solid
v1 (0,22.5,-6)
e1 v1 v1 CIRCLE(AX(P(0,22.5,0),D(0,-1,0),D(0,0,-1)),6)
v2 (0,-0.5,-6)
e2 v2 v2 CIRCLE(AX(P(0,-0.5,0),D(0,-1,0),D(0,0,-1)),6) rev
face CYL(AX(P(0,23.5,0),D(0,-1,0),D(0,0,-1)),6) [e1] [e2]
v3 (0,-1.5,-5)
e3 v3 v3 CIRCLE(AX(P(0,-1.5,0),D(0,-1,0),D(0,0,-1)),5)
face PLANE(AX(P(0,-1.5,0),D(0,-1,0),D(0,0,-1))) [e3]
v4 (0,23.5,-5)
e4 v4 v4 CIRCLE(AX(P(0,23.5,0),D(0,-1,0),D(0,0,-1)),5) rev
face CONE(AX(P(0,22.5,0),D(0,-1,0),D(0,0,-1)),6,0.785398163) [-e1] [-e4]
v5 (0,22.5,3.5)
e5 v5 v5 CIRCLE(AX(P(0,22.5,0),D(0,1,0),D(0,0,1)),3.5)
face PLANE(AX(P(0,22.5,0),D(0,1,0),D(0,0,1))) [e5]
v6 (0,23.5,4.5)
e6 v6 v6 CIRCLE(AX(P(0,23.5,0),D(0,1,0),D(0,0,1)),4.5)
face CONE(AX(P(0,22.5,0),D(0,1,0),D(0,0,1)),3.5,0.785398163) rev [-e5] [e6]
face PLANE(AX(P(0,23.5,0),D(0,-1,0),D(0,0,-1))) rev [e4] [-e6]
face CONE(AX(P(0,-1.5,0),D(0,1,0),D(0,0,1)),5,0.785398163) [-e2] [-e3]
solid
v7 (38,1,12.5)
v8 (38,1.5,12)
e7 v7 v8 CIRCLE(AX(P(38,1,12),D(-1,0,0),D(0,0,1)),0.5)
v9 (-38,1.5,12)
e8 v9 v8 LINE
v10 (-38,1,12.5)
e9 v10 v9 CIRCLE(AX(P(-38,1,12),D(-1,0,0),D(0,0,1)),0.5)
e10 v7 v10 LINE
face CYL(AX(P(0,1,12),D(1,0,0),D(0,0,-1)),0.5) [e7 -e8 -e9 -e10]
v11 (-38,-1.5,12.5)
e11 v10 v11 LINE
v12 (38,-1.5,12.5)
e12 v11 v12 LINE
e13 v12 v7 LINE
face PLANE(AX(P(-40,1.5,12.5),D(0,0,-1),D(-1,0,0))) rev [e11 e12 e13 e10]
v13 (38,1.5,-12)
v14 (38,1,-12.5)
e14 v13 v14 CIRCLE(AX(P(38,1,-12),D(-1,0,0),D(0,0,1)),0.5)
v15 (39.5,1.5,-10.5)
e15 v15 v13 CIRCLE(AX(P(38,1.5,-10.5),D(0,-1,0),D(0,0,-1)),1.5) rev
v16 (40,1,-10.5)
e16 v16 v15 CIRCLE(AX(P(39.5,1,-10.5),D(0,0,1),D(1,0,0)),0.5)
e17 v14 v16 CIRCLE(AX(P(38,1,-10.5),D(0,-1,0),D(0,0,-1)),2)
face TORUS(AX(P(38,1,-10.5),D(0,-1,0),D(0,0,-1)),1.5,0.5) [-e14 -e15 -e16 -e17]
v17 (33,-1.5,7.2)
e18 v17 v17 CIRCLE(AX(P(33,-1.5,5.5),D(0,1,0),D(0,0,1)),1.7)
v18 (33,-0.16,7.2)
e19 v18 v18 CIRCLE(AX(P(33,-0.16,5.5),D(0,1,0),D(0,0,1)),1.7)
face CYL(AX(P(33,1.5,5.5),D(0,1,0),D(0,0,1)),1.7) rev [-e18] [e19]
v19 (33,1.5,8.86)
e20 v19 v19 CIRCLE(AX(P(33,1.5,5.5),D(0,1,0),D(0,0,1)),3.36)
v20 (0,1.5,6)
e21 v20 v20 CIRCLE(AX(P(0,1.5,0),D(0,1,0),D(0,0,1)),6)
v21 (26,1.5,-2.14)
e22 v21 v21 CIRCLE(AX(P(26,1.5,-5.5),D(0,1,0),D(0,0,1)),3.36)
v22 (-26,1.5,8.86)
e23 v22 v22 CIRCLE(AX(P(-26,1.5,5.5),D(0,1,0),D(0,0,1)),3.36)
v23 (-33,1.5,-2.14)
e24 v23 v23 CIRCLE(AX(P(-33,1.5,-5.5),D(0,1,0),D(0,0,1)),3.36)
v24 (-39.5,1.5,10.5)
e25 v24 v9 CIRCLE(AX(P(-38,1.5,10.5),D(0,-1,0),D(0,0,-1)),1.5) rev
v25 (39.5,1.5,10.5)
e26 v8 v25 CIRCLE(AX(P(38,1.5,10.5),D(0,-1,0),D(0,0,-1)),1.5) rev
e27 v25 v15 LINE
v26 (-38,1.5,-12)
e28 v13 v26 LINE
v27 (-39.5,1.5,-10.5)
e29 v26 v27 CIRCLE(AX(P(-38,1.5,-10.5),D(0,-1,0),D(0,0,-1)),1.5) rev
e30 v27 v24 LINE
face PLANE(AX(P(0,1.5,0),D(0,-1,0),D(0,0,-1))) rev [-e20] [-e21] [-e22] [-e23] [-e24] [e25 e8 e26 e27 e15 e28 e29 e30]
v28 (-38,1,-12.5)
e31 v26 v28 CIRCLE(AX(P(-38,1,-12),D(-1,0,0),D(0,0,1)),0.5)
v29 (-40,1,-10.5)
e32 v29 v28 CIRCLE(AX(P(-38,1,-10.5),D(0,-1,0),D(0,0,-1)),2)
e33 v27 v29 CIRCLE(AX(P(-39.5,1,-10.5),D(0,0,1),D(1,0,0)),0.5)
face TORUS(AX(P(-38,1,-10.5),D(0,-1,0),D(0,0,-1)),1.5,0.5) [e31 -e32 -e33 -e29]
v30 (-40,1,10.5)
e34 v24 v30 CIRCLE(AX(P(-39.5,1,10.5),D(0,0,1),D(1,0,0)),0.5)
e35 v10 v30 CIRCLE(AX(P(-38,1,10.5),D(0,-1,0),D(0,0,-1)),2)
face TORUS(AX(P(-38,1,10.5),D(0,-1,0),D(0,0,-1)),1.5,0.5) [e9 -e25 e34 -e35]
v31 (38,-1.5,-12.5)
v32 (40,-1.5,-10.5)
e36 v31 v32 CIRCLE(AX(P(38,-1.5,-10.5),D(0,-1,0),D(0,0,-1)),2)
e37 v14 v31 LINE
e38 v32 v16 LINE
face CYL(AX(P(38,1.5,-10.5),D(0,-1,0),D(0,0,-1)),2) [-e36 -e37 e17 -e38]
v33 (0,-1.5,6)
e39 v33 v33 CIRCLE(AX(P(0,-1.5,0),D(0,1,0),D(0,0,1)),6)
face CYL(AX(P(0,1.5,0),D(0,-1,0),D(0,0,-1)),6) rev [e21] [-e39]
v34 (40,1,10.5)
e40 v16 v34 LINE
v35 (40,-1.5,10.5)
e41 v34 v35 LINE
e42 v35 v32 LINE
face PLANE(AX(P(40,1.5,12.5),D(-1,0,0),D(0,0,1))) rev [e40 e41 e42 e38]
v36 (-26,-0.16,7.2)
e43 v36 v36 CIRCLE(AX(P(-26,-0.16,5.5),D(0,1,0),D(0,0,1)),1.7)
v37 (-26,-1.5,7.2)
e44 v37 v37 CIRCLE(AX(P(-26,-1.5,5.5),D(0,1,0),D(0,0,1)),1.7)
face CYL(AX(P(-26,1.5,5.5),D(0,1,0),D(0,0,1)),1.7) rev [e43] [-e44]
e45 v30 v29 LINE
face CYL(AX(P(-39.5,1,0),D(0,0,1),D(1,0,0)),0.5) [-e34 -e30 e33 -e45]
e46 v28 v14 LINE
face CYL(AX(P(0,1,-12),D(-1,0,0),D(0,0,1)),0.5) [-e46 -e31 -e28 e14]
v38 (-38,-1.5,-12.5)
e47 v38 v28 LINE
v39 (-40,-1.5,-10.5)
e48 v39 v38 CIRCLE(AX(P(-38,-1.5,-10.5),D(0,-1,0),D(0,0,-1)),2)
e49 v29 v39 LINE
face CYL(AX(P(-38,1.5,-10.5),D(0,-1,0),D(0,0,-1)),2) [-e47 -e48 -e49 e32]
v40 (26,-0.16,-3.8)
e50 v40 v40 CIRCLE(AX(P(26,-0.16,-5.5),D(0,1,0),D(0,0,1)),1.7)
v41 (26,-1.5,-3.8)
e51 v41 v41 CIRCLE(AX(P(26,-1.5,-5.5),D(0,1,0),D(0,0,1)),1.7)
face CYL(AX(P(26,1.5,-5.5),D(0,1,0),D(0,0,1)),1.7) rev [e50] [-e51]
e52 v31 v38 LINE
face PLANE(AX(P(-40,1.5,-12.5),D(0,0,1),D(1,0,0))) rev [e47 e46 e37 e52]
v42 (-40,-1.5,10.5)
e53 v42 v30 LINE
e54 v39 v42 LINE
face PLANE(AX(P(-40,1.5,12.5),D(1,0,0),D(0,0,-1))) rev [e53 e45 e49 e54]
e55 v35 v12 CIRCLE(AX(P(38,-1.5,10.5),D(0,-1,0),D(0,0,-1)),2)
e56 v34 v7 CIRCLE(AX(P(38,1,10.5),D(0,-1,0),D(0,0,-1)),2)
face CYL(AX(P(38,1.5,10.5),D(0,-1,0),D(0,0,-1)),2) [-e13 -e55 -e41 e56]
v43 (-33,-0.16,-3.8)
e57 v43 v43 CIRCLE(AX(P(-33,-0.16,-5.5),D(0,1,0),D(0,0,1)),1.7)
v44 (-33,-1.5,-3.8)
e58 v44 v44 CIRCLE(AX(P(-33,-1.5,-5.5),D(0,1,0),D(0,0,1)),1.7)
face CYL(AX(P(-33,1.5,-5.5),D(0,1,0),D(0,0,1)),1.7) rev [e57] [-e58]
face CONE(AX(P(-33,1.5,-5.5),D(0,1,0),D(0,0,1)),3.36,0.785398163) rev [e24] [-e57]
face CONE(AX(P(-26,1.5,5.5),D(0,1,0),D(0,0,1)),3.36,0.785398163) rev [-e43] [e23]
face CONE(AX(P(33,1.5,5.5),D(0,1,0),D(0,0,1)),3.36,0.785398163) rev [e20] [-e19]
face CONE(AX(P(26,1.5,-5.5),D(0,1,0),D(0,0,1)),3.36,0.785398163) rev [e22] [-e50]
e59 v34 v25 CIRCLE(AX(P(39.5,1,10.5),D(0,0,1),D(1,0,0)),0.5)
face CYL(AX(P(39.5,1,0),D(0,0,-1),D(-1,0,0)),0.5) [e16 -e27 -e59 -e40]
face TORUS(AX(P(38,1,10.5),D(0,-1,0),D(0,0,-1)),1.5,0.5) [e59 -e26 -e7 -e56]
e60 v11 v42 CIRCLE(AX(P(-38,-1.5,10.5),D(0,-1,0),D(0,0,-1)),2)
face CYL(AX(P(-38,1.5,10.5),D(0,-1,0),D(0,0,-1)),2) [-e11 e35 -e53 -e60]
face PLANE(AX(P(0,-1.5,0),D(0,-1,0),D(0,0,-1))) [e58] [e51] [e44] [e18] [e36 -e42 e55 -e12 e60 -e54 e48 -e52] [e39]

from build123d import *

# Parameters (mm, degrees)
ESBO_O1_W                           = 80
ESBO_O1_H                           = 25
ESBO_O1_R                           = 6
RESSALTO_EXTRUS_O1_DEPTH            = 1.5
ESBO_O3_R                           = 6
RESSALTO_EXTRUS_O3_DEPTH            = 25
CHANFRO1_SIZE                       = 1
ESCAREADO_PARA_SFHCS_M31_AT_2_COUNT = 2
ESCAREADO_PARA_SFHCS_M31_AT_2_PITCH = 13.03840481
ESCAREADO_PARA_SFHCS_M31_AT_3_COUNT = 2
ESCAREADO_PARA_SFHCS_M31_AT_3_PITCH = 59
ESCAREADO_PARA_SFHCS_M31_AT_4_COUNT = 2
ESCAREADO_PARA_SFHCS_M31_AT_4_PITCH = 66.910387833
FILETE1_R                           = 2
FILETE2_R                           = 0.5
ESBO_O7_R                           = 4.5
CORTE_EXTRUS_O1_DEPTH               = 1
CHANFRO2_SIZE                       = 1


with BuildPart() as part:
    # Esboço1 → Ressalto-extrusão1 (new, symmetric)
    with BuildSketch(Plane(origin=(0, 0, 0), x_dir=(1, 0, 0), z_dir=(0, 1, 0))):
        Rectangle(ESBO_O1_W, ESBO_O1_H)
        with Locations(Location((0, 0, 0), (0, 0, 270))):
            Circle(ESBO_O1_R, mode=Mode.SUBTRACT)
    extrude(amount=RESSALTO_EXTRUS_O1_DEPTH, both=True)

    # Esboço6 → Escareado para SFHCS M31 (revolve, cut)
    with BuildSketch(Plane(origin=(-33, 1.5, -5.5), x_dir=(0, 0, 1), z_dir=(1, 0, 0))):
        Polygon((0, 0), (0, 3), (1.7, 3), (1.7, 1.66), (3.36, 0), align=None)
    escareado_para_sfhcs_m31 = revolve(axis=Axis((-33, 7.85, -5.5), (0, -1, 0)), mode=Mode.SUBTRACT)

    # Escareado para SFHCS M31 at 2: Escareado para SFHCS M31 ×2
    with Locations(*[Vector(0.5368754921931594, 0, 0.8436614877321075) * (i * ESCAREADO_PARA_SFHCS_M31_AT_2_PITCH) for i in range(1, ESCAREADO_PARA_SFHCS_M31_AT_2_COUNT)]):
        add(escareado_para_sfhcs_m31, mode=Mode.SUBTRACT)

    # Escareado para SFHCS M31 at 3: Escareado para SFHCS M31 ×2
    with Locations(*[(i * ESCAREADO_PARA_SFHCS_M31_AT_3_PITCH, 0, 0) for i in range(1, ESCAREADO_PARA_SFHCS_M31_AT_3_COUNT)]):
        add(escareado_para_sfhcs_m31, mode=Mode.SUBTRACT)

    # Escareado para SFHCS M31 at 4: Escareado para SFHCS M31 ×2
    with Locations(*[Vector(0.9863939238321439, 0, 0.16439898730535732) * (i * ESCAREADO_PARA_SFHCS_M31_AT_4_PITCH) for i in range(1, ESCAREADO_PARA_SFHCS_M31_AT_4_COUNT)]):
        add(escareado_para_sfhcs_m31, mode=Mode.SUBTRACT)

    # Filete1
    filete1_edges = [part.edges().sort_by_distance(p)[0] for p in [
        (40, 0, 12.5),
        (-40, 0, 12.5),
        (-40, 0, -12.5),
        (40, 0, -12.5),
    ]]
    fillet(filete1_edges, radius=FILETE1_R)

    # Filete2
    filete2_edges = [part.edges().sort_by_distance(p)[0] for p in [
        (0, 1.5, -12.5),
        (40, 1.5, 0),
        (-40, 1.5, 0),
        (0, 1.5, 12.5),
        (-39.414213562, 1.5, 11.914213562),
        (-39.414213562, 1.5, -11.914213562),
        (39.414213562, 1.5, 11.914213562),
        (39.414213562, 1.5, -11.914213562),
    ]]
    fillet(filete2_edges, radius=FILETE2_R)


with BuildPart() as body_2:
    # Esboço3 → Ressalto-extrusão3 (new body)
    with BuildSketch(Plane.XZ.offset(1.5)):
        with Locations(Location((0, 0, 0), (0, 0, 270))):
            Circle(ESBO_O3_R)
    extrude(amount=-RESSALTO_EXTRUS_O3_DEPTH)

    # Chanfro1
    chanfro1_edges = [body_2.edges().sort_by_distance(p)[0] for p in [
        (0, -1.5, 6),
        (0, 23.5, 6),
    ]]
    chamfer(chanfro1_edges, length=CHANFRO1_SIZE)

    # Esboço7 → Corte-extrusão1 (cut)
    with BuildSketch(Plane(origin=(0, 23.5, 0), x_dir=(1, 0, 0), z_dir=(0, 1, 0))):
        with Locations(Location((0, 0, 0), (0, 0, 270))):
            Circle(ESBO_O7_R)
    extrude(amount=-CORTE_EXTRUS_O1_DEPTH, mode=Mode.SUBTRACT)

    # Chanfro2
    chanfro2_edges = [body_2.edges().sort_by_distance(p)[0] for p in [
        (0, 22.5, -4.5),
    ]]
    chamfer(chanfro2_edges, length=CHANFRO2_SIZE - 0.0001)  # a hair under: the kernel refuses the full size


solid = Compound([part.part, body_2.part])
